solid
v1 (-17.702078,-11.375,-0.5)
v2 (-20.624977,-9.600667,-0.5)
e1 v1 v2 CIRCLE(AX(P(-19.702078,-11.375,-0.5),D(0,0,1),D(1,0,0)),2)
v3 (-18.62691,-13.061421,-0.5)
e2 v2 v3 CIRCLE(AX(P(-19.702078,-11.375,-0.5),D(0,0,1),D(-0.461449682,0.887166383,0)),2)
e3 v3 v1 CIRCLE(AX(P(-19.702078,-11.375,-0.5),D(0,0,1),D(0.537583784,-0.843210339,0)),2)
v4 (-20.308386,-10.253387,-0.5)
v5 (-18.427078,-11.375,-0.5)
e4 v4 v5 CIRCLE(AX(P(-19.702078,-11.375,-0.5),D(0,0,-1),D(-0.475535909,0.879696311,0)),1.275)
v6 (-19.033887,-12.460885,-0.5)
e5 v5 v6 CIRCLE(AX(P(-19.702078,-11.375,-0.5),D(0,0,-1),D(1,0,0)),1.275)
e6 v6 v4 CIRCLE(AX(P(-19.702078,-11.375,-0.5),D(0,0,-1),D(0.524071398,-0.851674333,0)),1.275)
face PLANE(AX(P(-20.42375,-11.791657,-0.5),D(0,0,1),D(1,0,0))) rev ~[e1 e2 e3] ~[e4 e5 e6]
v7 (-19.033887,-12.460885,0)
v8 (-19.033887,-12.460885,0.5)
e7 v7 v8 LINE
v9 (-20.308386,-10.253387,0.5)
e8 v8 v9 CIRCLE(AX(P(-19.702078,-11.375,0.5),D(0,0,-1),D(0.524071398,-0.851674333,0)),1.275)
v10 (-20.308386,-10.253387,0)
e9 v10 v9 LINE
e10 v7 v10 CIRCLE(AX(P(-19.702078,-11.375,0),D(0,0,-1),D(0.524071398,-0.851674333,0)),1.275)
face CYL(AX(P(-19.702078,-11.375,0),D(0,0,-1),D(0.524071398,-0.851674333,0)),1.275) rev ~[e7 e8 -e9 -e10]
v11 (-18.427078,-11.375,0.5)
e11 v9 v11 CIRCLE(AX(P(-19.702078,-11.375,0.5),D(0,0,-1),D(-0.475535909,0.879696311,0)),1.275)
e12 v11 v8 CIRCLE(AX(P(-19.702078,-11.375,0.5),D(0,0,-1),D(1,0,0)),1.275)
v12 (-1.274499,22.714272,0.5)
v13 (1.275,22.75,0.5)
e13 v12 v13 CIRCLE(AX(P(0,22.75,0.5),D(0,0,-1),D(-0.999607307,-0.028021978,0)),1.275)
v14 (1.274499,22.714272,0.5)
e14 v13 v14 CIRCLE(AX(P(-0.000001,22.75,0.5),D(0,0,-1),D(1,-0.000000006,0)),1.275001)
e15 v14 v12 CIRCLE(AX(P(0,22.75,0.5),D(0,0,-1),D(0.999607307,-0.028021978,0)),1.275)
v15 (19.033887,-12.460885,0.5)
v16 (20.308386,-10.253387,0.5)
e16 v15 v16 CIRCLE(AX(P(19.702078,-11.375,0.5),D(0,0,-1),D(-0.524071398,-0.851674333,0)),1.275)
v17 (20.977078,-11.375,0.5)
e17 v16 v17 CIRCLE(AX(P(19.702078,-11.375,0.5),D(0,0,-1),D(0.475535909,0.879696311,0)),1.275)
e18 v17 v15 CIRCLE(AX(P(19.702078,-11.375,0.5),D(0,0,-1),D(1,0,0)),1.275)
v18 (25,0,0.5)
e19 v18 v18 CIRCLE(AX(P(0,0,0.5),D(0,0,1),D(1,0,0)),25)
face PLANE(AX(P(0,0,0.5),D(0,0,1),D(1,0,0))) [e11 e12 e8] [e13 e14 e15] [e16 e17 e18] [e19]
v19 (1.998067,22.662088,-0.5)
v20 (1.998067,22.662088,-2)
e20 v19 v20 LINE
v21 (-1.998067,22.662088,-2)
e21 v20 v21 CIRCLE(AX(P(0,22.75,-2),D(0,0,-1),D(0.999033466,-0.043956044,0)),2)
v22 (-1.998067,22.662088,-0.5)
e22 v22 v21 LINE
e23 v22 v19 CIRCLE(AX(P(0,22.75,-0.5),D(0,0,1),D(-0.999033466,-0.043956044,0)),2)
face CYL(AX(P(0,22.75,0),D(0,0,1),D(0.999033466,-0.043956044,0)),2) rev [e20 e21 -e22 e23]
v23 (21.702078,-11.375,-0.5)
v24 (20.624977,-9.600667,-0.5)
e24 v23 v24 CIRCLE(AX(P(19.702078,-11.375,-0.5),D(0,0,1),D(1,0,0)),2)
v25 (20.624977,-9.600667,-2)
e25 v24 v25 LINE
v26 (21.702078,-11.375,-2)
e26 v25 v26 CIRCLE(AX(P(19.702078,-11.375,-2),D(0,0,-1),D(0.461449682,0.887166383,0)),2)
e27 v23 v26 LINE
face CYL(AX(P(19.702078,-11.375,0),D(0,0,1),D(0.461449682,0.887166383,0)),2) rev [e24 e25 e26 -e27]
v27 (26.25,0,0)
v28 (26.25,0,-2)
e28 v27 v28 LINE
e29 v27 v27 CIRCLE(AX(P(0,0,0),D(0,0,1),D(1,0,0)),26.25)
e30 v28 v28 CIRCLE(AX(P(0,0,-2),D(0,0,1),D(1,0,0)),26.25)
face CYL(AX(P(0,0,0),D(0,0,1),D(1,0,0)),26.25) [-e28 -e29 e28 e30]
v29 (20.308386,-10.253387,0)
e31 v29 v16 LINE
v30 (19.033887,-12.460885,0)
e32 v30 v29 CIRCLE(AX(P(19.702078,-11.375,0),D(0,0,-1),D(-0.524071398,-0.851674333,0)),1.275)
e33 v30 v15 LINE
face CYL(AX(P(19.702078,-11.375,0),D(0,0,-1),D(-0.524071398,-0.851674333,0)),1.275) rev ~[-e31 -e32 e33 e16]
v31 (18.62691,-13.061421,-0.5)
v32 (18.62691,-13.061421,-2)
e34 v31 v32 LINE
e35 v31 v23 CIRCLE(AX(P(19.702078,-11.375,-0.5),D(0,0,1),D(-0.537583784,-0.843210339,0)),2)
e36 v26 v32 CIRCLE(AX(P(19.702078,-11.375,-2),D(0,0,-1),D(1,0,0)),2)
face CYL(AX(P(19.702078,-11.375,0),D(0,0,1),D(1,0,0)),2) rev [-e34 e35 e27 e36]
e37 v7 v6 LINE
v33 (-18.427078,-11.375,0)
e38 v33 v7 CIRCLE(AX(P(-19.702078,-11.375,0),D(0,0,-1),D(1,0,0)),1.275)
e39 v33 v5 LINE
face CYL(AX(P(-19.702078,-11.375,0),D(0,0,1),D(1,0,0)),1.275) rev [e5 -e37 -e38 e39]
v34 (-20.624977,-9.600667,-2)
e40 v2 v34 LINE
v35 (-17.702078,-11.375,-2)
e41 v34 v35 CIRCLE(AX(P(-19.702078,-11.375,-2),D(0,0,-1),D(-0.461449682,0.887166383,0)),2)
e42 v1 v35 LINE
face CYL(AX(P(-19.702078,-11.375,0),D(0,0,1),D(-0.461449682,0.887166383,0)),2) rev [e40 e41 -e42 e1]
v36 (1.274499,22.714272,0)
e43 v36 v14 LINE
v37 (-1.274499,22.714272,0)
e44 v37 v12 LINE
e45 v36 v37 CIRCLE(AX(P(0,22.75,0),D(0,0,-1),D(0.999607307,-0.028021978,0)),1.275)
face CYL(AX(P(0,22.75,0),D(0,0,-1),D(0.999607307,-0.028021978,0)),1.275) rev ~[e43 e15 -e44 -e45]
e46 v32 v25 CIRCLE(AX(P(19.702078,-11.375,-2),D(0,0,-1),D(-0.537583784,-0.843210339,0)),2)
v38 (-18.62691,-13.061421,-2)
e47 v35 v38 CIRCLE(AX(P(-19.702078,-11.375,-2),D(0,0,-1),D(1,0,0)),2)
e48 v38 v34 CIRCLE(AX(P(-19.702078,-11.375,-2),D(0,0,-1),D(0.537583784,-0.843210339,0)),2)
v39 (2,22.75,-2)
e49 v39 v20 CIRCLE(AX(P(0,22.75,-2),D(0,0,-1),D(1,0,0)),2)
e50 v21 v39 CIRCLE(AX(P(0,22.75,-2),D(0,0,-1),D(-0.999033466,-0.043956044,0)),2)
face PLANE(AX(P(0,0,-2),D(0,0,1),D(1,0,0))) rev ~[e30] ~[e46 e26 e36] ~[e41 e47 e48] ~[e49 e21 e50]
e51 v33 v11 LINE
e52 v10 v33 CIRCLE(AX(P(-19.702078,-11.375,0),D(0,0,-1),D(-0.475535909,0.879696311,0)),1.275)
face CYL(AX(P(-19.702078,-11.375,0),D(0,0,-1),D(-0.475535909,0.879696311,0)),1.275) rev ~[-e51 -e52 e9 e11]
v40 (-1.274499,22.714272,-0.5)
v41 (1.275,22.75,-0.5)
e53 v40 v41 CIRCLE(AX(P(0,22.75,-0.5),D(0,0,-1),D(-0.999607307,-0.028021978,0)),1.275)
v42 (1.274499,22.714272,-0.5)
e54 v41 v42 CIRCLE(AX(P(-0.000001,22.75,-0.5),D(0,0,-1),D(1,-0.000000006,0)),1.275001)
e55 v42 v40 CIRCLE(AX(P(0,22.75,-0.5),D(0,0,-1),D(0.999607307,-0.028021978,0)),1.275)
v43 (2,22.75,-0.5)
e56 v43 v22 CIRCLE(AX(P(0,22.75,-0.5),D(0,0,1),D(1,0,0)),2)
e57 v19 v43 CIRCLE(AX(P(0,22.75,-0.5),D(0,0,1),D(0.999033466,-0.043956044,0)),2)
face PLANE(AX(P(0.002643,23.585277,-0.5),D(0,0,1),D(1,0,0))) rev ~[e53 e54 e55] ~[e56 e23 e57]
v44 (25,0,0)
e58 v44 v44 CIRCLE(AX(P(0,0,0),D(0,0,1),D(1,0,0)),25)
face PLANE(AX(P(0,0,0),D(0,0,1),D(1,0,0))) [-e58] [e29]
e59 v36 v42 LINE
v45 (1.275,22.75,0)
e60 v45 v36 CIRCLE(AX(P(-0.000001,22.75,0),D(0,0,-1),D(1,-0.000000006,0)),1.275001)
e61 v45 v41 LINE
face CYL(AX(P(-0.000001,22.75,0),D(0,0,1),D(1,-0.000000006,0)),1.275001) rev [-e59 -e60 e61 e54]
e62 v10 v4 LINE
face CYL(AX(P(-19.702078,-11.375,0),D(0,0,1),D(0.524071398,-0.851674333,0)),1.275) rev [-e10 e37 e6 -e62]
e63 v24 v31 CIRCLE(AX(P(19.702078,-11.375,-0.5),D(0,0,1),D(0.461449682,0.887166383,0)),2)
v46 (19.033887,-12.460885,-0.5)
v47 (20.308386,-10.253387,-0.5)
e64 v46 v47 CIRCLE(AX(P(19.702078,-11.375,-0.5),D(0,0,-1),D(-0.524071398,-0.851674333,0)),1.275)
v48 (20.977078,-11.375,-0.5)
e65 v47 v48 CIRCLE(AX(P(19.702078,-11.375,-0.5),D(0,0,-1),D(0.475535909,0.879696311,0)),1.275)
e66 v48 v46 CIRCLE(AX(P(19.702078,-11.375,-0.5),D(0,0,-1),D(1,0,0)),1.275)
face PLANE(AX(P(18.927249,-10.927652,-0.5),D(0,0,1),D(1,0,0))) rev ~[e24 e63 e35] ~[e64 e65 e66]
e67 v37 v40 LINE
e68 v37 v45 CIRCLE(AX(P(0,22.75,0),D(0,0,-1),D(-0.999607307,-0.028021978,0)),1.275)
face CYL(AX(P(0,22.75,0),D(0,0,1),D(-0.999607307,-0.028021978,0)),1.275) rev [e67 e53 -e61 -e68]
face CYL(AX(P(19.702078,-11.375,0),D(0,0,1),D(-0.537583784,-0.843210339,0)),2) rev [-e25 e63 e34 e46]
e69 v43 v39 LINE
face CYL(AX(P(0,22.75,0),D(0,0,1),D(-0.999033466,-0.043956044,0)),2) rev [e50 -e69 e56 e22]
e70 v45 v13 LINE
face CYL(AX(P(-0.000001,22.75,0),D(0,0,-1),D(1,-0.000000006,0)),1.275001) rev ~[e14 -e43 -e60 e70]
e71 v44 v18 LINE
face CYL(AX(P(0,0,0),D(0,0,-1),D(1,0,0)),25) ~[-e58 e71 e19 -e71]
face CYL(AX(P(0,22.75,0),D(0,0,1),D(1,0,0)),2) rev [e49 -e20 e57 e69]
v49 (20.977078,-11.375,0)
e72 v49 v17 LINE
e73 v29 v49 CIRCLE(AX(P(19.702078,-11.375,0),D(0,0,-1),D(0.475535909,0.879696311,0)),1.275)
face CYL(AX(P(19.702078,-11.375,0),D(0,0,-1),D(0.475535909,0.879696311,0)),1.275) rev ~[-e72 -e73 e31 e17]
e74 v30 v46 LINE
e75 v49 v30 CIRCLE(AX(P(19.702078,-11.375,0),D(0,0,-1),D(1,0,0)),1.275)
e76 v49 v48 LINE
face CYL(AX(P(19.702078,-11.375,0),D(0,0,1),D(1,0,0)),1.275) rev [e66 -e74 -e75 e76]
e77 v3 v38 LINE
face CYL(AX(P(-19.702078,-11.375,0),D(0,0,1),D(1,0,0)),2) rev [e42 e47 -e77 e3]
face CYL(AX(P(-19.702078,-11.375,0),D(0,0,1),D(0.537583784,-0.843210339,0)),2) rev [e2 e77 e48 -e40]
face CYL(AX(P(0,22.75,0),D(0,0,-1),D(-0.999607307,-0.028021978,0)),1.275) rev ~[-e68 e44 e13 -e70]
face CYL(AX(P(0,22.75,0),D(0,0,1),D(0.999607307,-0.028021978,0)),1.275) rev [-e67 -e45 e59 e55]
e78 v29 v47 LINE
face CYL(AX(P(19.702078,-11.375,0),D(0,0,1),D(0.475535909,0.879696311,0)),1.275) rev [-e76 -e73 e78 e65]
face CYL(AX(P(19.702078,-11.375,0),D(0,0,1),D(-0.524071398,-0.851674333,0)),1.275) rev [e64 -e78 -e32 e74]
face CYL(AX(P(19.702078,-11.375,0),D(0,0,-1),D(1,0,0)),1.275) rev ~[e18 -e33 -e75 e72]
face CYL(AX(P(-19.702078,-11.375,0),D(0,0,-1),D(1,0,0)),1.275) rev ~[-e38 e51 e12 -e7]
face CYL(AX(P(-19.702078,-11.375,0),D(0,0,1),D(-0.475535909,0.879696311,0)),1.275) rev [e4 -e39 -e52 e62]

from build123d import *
from build123d import SkipClean  # not in build123d's __all__

# Parameters (mm, degrees)
F0_R     = 25
F1_DEPTH = 0.5
F0_R_2   = 26.25
F2_DEPTH = 2
F3_DEPTH = 0.5


with BuildPart() as f1:
    # F0 (on Top) → F1 (new body)
    with BuildSketch(Plane.XY):
        Circle(F0_R)
        with BuildLine():
            ThreePointArc((1.998066932, 22.6620879121), (16.7782377308, 15.3640241684), (22.75, 0))
            ThreePointArc((22.75, 0), (22.2123921898, -4.9165163688), (20.6249773007, -9.6006672345))
            ThreePointArc((20.6249773007, -9.6006672345), (21.4117268371, -10.3371654104), (21.7020779361, -11.375))
            ThreePointArc((21.7020779361, -11.375), (20.6637600211, -13.12861557), (18.6269103687, -13.0614206776))
            ThreePointArc((18.6269103687, -13.0614206776), (0, -22.75), (-18.6269103687, -13.0614206776))
            ThreePointArc((-18.6269103687, -13.0614206776), (-21.4341287437, -12.375), (-20.6249773007, -9.6006672345))
            ThreePointArc((-20.6249773007, -9.6006672345), (-19.7020779361, 11.375), (-1.998066932, 22.6620879121))
            ThreePointArc((-1.998066932, 22.6620879121), (-0.0439666691, 24.7495166746), (2, 22.75))
            ThreePointArc((2, 22.75), (1.9995166746, 22.7060333309), (1.998066932, 22.6620879121))
        make_face(mode=Mode.SUBTRACT)
        with BuildLine():
            ThreePointArc((20.6249773007, -9.6006672345), (22.2123921898, -4.9165163688), (22.75, 0))
            ThreePointArc((22.75, 0), (16.7782377308, 15.3640241684), (1.998066932, 22.6620879121))
            ThreePointArc((1.998066932, 22.6620879121), (0, 20.75), (-1.998066932, 22.6620879121))
            ThreePointArc((-1.998066932, 22.6620879121), (-19.7020779361, 11.375), (-20.6249773007, -9.6006672345))
            ThreePointArc((-20.6249773007, -9.6006672345), (-18.6642433465, -9.665351099), (-17.7020779361, -11.375))
            ThreePointArc((-17.7020779361, -11.375), (-17.9484623661, -12.336682085), (-18.6269103687, -13.0614206776))
            ThreePointArc((-18.6269103687, -13.0614206776), (0, -22.75), (18.6269103687, -13.0614206776))
            ThreePointArc((18.6269103687, -13.0614206776), (17.9700271285, -10.375), (20.6249773007, -9.6006672345))
        make_face()
        with BuildLine():
            ThreePointArc((-20.3083862198, -10.2533872036), (-20.4692836493, -9.9282892225), (-20.6249773007, -9.6006672345))
            ThreePointArc((-20.6249773007, -9.6006672345), (-21.4341287437, -12.375), (-18.6269103687, -13.0614206776))
            ThreePointArc((-18.6269103687, -13.0614206776), (-18.8327925074, -12.7627750263), (-19.0338869031, -12.4608847744))
            ThreePointArc((-19.0338869031, -12.4608847744), (-20.8062603259, -12.0125), (-20.3083862198, -10.2533872036))
        make_face()
        with BuildLine():
            ThreePointArc((21.7020779361, -11.375), (21.4117268371, -10.3371654104), (20.6249773007, -9.6006672345))
            ThreePointArc((20.6249773007, -9.6006672345), (20.4692836493, -9.9282892225), (20.3083862198, -10.2533872036))
            ThreePointArc((20.3083862198, -10.2533872036), (20.797219037, -10.7220903821), (20.9770779361, -11.375))
            ThreePointArc((20.9770779361, -11.375), (20.3240431413, -12.4880068659), (19.0338869031, -12.4608847744))
            ThreePointArc((19.0338869031, -12.4608847744), (18.8327925074, -12.7627750263), (18.6269103687, -13.0614206776))
            ThreePointArc((18.6269103687, -13.0614206776), (20.6637600211, -13.12861557), (21.7020779361, -11.375))
        make_face()
        with BuildLine():
            ThreePointArc((1.2744993168, 22.714271978), (1.6364911418, 22.6910642488), (1.998066932, 22.6620879121))
            ThreePointArc((1.998066932, 22.6620879121), (1.9995166746, 22.7060333309), (2, 22.75))
            ThreePointArc((2, 22.75), (-0.0439666691, 24.7495166746), (-1.998066932, 22.6620879121))
            ThreePointArc((-1.998066932, 22.6620879121), (-1.6364911418, 22.6910642488), (-1.2744993168, 22.714271978))
            ThreePointArc((-1.2744993168, 22.714271978), (-0.017865765, 24.024874823), (1.275, 22.75))
            ThreePointArc((1.275, 22.75), (1.274874823, 22.732134235), (1.2744993168, 22.714271978))
        make_face()
        with BuildLine():
            ThreePointArc((-17.7020779361, -11.375), (-18.6642433465, -9.665351099), (-20.6249773007, -9.6006672345))
            ThreePointArc((-20.6249773007, -9.6006672345), (-20.4692836493, -9.9282892225), (-20.3083862198, -10.2533872036))
            ThreePointArc((-20.3083862198, -10.2533872036), (-19.0491683182, -10.2798588991), (-18.4270779361, -11.375))
            ThreePointArc((-18.4270779361, -11.375), (-18.5890710702, -11.9969652052), (-19.0338869031, -12.4608847744))
            ThreePointArc((-19.0338869031, -12.4608847744), (-18.8327925074, -12.7627750263), (-18.6269103687, -13.0614206776))
            ThreePointArc((-18.6269103687, -13.0614206776), (-17.9484623661, -12.336682085), (-17.7020779361, -11.375))
        make_face()
        with BuildLine():
            ThreePointArc((20.3083862198, -10.2533872036), (20.4692836493, -9.9282892225), (20.6249773007, -9.6006672345))
            ThreePointArc((20.6249773007, -9.6006672345), (17.9700271285, -10.375), (18.6269103687, -13.0614206776))
            ThreePointArc((18.6269103687, -13.0614206776), (18.8327925074, -12.7627750263), (19.0338869031, -12.4608847744))
            ThreePointArc((19.0338869031, -12.4608847744), (18.5978955463, -10.7375), (20.3083862198, -10.2533872036))
        make_face()
        with BuildLine():
            ThreePointArc((-1.998066932, 22.6620879121), (0, 20.75), (1.998066932, 22.6620879121))
            ThreePointArc((1.998066932, 22.6620879121), (1.6364911418, 22.6910642488), (1.2744993168, 22.714271978))
            ThreePointArc((1.2744993168, 22.714271978), (0, 21.475), (-1.2744993168, 22.714271978))
            ThreePointArc((-1.2744993168, 22.714271978), (-1.6364911418, 22.6910642488), (-1.998066932, 22.6620879121))
        make_face()
    extrude(amount=F1_DEPTH)

    # F0 (on Top) → F2 (join)
    with BuildSketch(Plane.XY):
        Circle(F0_R_2)
        Circle(F0_R, mode=Mode.SUBTRACT)
        Circle(F0_R)
        with BuildLine():
            ThreePointArc((1.998066932, 22.6620879121), (16.7782377308, 15.3640241684), (22.75, 0))
            ThreePointArc((22.75, 0), (22.2123921898, -4.9165163688), (20.6249773007, -9.6006672345))
            ThreePointArc((20.6249773007, -9.6006672345), (21.4117268371, -10.3371654104), (21.7020779361, -11.375))
            ThreePointArc((21.7020779361, -11.375), (20.6637600211, -13.12861557), (18.6269103687, -13.0614206776))
            ThreePointArc((18.6269103687, -13.0614206776), (0, -22.75), (-18.6269103687, -13.0614206776))
            ThreePointArc((-18.6269103687, -13.0614206776), (-21.4341287437, -12.375), (-20.6249773007, -9.6006672345))
            ThreePointArc((-20.6249773007, -9.6006672345), (-19.7020779361, 11.375), (-1.998066932, 22.6620879121))
            ThreePointArc((-1.998066932, 22.6620879121), (-0.0439666691, 24.7495166746), (2, 22.75))
            ThreePointArc((2, 22.75), (1.9995166746, 22.7060333309), (1.998066932, 22.6620879121))
        make_face(mode=Mode.SUBTRACT)
        with BuildLine():
            ThreePointArc((20.6249773007, -9.6006672345), (22.2123921898, -4.9165163688), (22.75, 0))
            ThreePointArc((22.75, 0), (16.7782377308, 15.3640241684), (1.998066932, 22.6620879121))
            ThreePointArc((1.998066932, 22.6620879121), (0, 20.75), (-1.998066932, 22.6620879121))
            ThreePointArc((-1.998066932, 22.6620879121), (-19.7020779361, 11.375), (-20.6249773007, -9.6006672345))
            ThreePointArc((-20.6249773007, -9.6006672345), (-18.6642433465, -9.665351099), (-17.7020779361, -11.375))
            ThreePointArc((-17.7020779361, -11.375), (-17.9484623661, -12.336682085), (-18.6269103687, -13.0614206776))
            ThreePointArc((-18.6269103687, -13.0614206776), (0, -22.75), (18.6269103687, -13.0614206776))
            ThreePointArc((18.6269103687, -13.0614206776), (17.9700271285, -10.375), (20.6249773007, -9.6006672345))
        make_face()
    extrude(amount=-F2_DEPTH)

    # F0 (on Top) → F3 (join)
    with BuildSketch(Plane.XY):
        with BuildLine():
            ThreePointArc((1.2744993168, 22.714271978), (1.6364911418, 22.6910642488), (1.998066932, 22.6620879121))
            ThreePointArc((1.998066932, 22.6620879121), (1.9995166746, 22.7060333309), (2, 22.75))
            ThreePointArc((2, 22.75), (-0.0439666691, 24.7495166746), (-1.998066932, 22.6620879121))
            ThreePointArc((-1.998066932, 22.6620879121), (-1.6364911418, 22.6910642488), (-1.2744993168, 22.714271978))
            ThreePointArc((-1.2744993168, 22.714271978), (-0.017865765, 24.024874823), (1.275, 22.75))
            ThreePointArc((1.275, 22.75), (1.274874823, 22.732134235), (1.2744993168, 22.714271978))
        make_face()
        with BuildLine():
            ThreePointArc((-1.998066932, 22.6620879121), (0, 20.75), (1.998066932, 22.6620879121))
            ThreePointArc((1.998066932, 22.6620879121), (1.6364911418, 22.6910642488), (1.2744993168, 22.714271978))
            ThreePointArc((1.2744993168, 22.714271978), (0, 21.475), (-1.2744993168, 22.714271978))
            ThreePointArc((-1.2744993168, 22.714271978), (-1.6364911418, 22.6910642488), (-1.998066932, 22.6620879121))
        make_face()
        with BuildLine():
            ThreePointArc((-20.3083862198, -10.2533872036), (-20.4692836493, -9.9282892225), (-20.6249773007, -9.6006672345))
            ThreePointArc((-20.6249773007, -9.6006672345), (-21.4341287437, -12.375), (-18.6269103687, -13.0614206776))
            ThreePointArc((-18.6269103687, -13.0614206776), (-18.8327925074, -12.7627750263), (-19.0338869031, -12.4608847744))
            ThreePointArc((-19.0338869031, -12.4608847744), (-20.8062603259, -12.0125), (-20.3083862198, -10.2533872036))
        make_face()
        with BuildLine():
            ThreePointArc((-17.7020779361, -11.375), (-18.6642433465, -9.665351099), (-20.6249773007, -9.6006672345))
            ThreePointArc((-20.6249773007, -9.6006672345), (-20.4692836493, -9.9282892225), (-20.3083862198, -10.2533872036))
            ThreePointArc((-20.3083862198, -10.2533872036), (-19.0491683182, -10.2798588991), (-18.4270779361, -11.375))
            ThreePointArc((-18.4270779361, -11.375), (-18.5890710702, -11.9969652052), (-19.0338869031, -12.4608847744))
            ThreePointArc((-19.0338869031, -12.4608847744), (-18.8327925074, -12.7627750263), (-18.6269103687, -13.0614206776))
            ThreePointArc((-18.6269103687, -13.0614206776), (-17.9484623661, -12.336682085), (-17.7020779361, -11.375))
        make_face()
        with BuildLine():
            ThreePointArc((20.3083862198, -10.2533872036), (20.4692836493, -9.9282892225), (20.6249773007, -9.6006672345))
            ThreePointArc((20.6249773007, -9.6006672345), (17.9700271285, -10.375), (18.6269103687, -13.0614206776))
            ThreePointArc((18.6269103687, -13.0614206776), (18.8327925074, -12.7627750263), (19.0338869031, -12.4608847744))
            ThreePointArc((19.0338869031, -12.4608847744), (18.5978955463, -10.7375), (20.3083862198, -10.2533872036))
        make_face()
        with BuildLine():
            ThreePointArc((21.7020779361, -11.375), (21.4117268371, -10.3371654104), (20.6249773007, -9.6006672345))
            ThreePointArc((20.6249773007, -9.6006672345), (20.4692836493, -9.9282892225), (20.3083862198, -10.2533872036))
            ThreePointArc((20.3083862198, -10.2533872036), (20.797219037, -10.7220903821), (20.9770779361, -11.375))
            ThreePointArc((20.9770779361, -11.375), (20.3240431413, -12.4880068659), (19.0338869031, -12.4608847744))
            ThreePointArc((19.0338869031, -12.4608847744), (18.8327925074, -12.7627750263), (18.6269103687, -13.0614206776))
            ThreePointArc((18.6269103687, -13.0614206776), (20.6637600211, -13.12861557), (21.7020779361, -11.375))
        make_face()
    with SkipClean():  # cleaning this boolean's faces spoils the solid; the shape is the same uncleaned
        extrude(amount=-F3_DEPTH)


solid = f1.part
